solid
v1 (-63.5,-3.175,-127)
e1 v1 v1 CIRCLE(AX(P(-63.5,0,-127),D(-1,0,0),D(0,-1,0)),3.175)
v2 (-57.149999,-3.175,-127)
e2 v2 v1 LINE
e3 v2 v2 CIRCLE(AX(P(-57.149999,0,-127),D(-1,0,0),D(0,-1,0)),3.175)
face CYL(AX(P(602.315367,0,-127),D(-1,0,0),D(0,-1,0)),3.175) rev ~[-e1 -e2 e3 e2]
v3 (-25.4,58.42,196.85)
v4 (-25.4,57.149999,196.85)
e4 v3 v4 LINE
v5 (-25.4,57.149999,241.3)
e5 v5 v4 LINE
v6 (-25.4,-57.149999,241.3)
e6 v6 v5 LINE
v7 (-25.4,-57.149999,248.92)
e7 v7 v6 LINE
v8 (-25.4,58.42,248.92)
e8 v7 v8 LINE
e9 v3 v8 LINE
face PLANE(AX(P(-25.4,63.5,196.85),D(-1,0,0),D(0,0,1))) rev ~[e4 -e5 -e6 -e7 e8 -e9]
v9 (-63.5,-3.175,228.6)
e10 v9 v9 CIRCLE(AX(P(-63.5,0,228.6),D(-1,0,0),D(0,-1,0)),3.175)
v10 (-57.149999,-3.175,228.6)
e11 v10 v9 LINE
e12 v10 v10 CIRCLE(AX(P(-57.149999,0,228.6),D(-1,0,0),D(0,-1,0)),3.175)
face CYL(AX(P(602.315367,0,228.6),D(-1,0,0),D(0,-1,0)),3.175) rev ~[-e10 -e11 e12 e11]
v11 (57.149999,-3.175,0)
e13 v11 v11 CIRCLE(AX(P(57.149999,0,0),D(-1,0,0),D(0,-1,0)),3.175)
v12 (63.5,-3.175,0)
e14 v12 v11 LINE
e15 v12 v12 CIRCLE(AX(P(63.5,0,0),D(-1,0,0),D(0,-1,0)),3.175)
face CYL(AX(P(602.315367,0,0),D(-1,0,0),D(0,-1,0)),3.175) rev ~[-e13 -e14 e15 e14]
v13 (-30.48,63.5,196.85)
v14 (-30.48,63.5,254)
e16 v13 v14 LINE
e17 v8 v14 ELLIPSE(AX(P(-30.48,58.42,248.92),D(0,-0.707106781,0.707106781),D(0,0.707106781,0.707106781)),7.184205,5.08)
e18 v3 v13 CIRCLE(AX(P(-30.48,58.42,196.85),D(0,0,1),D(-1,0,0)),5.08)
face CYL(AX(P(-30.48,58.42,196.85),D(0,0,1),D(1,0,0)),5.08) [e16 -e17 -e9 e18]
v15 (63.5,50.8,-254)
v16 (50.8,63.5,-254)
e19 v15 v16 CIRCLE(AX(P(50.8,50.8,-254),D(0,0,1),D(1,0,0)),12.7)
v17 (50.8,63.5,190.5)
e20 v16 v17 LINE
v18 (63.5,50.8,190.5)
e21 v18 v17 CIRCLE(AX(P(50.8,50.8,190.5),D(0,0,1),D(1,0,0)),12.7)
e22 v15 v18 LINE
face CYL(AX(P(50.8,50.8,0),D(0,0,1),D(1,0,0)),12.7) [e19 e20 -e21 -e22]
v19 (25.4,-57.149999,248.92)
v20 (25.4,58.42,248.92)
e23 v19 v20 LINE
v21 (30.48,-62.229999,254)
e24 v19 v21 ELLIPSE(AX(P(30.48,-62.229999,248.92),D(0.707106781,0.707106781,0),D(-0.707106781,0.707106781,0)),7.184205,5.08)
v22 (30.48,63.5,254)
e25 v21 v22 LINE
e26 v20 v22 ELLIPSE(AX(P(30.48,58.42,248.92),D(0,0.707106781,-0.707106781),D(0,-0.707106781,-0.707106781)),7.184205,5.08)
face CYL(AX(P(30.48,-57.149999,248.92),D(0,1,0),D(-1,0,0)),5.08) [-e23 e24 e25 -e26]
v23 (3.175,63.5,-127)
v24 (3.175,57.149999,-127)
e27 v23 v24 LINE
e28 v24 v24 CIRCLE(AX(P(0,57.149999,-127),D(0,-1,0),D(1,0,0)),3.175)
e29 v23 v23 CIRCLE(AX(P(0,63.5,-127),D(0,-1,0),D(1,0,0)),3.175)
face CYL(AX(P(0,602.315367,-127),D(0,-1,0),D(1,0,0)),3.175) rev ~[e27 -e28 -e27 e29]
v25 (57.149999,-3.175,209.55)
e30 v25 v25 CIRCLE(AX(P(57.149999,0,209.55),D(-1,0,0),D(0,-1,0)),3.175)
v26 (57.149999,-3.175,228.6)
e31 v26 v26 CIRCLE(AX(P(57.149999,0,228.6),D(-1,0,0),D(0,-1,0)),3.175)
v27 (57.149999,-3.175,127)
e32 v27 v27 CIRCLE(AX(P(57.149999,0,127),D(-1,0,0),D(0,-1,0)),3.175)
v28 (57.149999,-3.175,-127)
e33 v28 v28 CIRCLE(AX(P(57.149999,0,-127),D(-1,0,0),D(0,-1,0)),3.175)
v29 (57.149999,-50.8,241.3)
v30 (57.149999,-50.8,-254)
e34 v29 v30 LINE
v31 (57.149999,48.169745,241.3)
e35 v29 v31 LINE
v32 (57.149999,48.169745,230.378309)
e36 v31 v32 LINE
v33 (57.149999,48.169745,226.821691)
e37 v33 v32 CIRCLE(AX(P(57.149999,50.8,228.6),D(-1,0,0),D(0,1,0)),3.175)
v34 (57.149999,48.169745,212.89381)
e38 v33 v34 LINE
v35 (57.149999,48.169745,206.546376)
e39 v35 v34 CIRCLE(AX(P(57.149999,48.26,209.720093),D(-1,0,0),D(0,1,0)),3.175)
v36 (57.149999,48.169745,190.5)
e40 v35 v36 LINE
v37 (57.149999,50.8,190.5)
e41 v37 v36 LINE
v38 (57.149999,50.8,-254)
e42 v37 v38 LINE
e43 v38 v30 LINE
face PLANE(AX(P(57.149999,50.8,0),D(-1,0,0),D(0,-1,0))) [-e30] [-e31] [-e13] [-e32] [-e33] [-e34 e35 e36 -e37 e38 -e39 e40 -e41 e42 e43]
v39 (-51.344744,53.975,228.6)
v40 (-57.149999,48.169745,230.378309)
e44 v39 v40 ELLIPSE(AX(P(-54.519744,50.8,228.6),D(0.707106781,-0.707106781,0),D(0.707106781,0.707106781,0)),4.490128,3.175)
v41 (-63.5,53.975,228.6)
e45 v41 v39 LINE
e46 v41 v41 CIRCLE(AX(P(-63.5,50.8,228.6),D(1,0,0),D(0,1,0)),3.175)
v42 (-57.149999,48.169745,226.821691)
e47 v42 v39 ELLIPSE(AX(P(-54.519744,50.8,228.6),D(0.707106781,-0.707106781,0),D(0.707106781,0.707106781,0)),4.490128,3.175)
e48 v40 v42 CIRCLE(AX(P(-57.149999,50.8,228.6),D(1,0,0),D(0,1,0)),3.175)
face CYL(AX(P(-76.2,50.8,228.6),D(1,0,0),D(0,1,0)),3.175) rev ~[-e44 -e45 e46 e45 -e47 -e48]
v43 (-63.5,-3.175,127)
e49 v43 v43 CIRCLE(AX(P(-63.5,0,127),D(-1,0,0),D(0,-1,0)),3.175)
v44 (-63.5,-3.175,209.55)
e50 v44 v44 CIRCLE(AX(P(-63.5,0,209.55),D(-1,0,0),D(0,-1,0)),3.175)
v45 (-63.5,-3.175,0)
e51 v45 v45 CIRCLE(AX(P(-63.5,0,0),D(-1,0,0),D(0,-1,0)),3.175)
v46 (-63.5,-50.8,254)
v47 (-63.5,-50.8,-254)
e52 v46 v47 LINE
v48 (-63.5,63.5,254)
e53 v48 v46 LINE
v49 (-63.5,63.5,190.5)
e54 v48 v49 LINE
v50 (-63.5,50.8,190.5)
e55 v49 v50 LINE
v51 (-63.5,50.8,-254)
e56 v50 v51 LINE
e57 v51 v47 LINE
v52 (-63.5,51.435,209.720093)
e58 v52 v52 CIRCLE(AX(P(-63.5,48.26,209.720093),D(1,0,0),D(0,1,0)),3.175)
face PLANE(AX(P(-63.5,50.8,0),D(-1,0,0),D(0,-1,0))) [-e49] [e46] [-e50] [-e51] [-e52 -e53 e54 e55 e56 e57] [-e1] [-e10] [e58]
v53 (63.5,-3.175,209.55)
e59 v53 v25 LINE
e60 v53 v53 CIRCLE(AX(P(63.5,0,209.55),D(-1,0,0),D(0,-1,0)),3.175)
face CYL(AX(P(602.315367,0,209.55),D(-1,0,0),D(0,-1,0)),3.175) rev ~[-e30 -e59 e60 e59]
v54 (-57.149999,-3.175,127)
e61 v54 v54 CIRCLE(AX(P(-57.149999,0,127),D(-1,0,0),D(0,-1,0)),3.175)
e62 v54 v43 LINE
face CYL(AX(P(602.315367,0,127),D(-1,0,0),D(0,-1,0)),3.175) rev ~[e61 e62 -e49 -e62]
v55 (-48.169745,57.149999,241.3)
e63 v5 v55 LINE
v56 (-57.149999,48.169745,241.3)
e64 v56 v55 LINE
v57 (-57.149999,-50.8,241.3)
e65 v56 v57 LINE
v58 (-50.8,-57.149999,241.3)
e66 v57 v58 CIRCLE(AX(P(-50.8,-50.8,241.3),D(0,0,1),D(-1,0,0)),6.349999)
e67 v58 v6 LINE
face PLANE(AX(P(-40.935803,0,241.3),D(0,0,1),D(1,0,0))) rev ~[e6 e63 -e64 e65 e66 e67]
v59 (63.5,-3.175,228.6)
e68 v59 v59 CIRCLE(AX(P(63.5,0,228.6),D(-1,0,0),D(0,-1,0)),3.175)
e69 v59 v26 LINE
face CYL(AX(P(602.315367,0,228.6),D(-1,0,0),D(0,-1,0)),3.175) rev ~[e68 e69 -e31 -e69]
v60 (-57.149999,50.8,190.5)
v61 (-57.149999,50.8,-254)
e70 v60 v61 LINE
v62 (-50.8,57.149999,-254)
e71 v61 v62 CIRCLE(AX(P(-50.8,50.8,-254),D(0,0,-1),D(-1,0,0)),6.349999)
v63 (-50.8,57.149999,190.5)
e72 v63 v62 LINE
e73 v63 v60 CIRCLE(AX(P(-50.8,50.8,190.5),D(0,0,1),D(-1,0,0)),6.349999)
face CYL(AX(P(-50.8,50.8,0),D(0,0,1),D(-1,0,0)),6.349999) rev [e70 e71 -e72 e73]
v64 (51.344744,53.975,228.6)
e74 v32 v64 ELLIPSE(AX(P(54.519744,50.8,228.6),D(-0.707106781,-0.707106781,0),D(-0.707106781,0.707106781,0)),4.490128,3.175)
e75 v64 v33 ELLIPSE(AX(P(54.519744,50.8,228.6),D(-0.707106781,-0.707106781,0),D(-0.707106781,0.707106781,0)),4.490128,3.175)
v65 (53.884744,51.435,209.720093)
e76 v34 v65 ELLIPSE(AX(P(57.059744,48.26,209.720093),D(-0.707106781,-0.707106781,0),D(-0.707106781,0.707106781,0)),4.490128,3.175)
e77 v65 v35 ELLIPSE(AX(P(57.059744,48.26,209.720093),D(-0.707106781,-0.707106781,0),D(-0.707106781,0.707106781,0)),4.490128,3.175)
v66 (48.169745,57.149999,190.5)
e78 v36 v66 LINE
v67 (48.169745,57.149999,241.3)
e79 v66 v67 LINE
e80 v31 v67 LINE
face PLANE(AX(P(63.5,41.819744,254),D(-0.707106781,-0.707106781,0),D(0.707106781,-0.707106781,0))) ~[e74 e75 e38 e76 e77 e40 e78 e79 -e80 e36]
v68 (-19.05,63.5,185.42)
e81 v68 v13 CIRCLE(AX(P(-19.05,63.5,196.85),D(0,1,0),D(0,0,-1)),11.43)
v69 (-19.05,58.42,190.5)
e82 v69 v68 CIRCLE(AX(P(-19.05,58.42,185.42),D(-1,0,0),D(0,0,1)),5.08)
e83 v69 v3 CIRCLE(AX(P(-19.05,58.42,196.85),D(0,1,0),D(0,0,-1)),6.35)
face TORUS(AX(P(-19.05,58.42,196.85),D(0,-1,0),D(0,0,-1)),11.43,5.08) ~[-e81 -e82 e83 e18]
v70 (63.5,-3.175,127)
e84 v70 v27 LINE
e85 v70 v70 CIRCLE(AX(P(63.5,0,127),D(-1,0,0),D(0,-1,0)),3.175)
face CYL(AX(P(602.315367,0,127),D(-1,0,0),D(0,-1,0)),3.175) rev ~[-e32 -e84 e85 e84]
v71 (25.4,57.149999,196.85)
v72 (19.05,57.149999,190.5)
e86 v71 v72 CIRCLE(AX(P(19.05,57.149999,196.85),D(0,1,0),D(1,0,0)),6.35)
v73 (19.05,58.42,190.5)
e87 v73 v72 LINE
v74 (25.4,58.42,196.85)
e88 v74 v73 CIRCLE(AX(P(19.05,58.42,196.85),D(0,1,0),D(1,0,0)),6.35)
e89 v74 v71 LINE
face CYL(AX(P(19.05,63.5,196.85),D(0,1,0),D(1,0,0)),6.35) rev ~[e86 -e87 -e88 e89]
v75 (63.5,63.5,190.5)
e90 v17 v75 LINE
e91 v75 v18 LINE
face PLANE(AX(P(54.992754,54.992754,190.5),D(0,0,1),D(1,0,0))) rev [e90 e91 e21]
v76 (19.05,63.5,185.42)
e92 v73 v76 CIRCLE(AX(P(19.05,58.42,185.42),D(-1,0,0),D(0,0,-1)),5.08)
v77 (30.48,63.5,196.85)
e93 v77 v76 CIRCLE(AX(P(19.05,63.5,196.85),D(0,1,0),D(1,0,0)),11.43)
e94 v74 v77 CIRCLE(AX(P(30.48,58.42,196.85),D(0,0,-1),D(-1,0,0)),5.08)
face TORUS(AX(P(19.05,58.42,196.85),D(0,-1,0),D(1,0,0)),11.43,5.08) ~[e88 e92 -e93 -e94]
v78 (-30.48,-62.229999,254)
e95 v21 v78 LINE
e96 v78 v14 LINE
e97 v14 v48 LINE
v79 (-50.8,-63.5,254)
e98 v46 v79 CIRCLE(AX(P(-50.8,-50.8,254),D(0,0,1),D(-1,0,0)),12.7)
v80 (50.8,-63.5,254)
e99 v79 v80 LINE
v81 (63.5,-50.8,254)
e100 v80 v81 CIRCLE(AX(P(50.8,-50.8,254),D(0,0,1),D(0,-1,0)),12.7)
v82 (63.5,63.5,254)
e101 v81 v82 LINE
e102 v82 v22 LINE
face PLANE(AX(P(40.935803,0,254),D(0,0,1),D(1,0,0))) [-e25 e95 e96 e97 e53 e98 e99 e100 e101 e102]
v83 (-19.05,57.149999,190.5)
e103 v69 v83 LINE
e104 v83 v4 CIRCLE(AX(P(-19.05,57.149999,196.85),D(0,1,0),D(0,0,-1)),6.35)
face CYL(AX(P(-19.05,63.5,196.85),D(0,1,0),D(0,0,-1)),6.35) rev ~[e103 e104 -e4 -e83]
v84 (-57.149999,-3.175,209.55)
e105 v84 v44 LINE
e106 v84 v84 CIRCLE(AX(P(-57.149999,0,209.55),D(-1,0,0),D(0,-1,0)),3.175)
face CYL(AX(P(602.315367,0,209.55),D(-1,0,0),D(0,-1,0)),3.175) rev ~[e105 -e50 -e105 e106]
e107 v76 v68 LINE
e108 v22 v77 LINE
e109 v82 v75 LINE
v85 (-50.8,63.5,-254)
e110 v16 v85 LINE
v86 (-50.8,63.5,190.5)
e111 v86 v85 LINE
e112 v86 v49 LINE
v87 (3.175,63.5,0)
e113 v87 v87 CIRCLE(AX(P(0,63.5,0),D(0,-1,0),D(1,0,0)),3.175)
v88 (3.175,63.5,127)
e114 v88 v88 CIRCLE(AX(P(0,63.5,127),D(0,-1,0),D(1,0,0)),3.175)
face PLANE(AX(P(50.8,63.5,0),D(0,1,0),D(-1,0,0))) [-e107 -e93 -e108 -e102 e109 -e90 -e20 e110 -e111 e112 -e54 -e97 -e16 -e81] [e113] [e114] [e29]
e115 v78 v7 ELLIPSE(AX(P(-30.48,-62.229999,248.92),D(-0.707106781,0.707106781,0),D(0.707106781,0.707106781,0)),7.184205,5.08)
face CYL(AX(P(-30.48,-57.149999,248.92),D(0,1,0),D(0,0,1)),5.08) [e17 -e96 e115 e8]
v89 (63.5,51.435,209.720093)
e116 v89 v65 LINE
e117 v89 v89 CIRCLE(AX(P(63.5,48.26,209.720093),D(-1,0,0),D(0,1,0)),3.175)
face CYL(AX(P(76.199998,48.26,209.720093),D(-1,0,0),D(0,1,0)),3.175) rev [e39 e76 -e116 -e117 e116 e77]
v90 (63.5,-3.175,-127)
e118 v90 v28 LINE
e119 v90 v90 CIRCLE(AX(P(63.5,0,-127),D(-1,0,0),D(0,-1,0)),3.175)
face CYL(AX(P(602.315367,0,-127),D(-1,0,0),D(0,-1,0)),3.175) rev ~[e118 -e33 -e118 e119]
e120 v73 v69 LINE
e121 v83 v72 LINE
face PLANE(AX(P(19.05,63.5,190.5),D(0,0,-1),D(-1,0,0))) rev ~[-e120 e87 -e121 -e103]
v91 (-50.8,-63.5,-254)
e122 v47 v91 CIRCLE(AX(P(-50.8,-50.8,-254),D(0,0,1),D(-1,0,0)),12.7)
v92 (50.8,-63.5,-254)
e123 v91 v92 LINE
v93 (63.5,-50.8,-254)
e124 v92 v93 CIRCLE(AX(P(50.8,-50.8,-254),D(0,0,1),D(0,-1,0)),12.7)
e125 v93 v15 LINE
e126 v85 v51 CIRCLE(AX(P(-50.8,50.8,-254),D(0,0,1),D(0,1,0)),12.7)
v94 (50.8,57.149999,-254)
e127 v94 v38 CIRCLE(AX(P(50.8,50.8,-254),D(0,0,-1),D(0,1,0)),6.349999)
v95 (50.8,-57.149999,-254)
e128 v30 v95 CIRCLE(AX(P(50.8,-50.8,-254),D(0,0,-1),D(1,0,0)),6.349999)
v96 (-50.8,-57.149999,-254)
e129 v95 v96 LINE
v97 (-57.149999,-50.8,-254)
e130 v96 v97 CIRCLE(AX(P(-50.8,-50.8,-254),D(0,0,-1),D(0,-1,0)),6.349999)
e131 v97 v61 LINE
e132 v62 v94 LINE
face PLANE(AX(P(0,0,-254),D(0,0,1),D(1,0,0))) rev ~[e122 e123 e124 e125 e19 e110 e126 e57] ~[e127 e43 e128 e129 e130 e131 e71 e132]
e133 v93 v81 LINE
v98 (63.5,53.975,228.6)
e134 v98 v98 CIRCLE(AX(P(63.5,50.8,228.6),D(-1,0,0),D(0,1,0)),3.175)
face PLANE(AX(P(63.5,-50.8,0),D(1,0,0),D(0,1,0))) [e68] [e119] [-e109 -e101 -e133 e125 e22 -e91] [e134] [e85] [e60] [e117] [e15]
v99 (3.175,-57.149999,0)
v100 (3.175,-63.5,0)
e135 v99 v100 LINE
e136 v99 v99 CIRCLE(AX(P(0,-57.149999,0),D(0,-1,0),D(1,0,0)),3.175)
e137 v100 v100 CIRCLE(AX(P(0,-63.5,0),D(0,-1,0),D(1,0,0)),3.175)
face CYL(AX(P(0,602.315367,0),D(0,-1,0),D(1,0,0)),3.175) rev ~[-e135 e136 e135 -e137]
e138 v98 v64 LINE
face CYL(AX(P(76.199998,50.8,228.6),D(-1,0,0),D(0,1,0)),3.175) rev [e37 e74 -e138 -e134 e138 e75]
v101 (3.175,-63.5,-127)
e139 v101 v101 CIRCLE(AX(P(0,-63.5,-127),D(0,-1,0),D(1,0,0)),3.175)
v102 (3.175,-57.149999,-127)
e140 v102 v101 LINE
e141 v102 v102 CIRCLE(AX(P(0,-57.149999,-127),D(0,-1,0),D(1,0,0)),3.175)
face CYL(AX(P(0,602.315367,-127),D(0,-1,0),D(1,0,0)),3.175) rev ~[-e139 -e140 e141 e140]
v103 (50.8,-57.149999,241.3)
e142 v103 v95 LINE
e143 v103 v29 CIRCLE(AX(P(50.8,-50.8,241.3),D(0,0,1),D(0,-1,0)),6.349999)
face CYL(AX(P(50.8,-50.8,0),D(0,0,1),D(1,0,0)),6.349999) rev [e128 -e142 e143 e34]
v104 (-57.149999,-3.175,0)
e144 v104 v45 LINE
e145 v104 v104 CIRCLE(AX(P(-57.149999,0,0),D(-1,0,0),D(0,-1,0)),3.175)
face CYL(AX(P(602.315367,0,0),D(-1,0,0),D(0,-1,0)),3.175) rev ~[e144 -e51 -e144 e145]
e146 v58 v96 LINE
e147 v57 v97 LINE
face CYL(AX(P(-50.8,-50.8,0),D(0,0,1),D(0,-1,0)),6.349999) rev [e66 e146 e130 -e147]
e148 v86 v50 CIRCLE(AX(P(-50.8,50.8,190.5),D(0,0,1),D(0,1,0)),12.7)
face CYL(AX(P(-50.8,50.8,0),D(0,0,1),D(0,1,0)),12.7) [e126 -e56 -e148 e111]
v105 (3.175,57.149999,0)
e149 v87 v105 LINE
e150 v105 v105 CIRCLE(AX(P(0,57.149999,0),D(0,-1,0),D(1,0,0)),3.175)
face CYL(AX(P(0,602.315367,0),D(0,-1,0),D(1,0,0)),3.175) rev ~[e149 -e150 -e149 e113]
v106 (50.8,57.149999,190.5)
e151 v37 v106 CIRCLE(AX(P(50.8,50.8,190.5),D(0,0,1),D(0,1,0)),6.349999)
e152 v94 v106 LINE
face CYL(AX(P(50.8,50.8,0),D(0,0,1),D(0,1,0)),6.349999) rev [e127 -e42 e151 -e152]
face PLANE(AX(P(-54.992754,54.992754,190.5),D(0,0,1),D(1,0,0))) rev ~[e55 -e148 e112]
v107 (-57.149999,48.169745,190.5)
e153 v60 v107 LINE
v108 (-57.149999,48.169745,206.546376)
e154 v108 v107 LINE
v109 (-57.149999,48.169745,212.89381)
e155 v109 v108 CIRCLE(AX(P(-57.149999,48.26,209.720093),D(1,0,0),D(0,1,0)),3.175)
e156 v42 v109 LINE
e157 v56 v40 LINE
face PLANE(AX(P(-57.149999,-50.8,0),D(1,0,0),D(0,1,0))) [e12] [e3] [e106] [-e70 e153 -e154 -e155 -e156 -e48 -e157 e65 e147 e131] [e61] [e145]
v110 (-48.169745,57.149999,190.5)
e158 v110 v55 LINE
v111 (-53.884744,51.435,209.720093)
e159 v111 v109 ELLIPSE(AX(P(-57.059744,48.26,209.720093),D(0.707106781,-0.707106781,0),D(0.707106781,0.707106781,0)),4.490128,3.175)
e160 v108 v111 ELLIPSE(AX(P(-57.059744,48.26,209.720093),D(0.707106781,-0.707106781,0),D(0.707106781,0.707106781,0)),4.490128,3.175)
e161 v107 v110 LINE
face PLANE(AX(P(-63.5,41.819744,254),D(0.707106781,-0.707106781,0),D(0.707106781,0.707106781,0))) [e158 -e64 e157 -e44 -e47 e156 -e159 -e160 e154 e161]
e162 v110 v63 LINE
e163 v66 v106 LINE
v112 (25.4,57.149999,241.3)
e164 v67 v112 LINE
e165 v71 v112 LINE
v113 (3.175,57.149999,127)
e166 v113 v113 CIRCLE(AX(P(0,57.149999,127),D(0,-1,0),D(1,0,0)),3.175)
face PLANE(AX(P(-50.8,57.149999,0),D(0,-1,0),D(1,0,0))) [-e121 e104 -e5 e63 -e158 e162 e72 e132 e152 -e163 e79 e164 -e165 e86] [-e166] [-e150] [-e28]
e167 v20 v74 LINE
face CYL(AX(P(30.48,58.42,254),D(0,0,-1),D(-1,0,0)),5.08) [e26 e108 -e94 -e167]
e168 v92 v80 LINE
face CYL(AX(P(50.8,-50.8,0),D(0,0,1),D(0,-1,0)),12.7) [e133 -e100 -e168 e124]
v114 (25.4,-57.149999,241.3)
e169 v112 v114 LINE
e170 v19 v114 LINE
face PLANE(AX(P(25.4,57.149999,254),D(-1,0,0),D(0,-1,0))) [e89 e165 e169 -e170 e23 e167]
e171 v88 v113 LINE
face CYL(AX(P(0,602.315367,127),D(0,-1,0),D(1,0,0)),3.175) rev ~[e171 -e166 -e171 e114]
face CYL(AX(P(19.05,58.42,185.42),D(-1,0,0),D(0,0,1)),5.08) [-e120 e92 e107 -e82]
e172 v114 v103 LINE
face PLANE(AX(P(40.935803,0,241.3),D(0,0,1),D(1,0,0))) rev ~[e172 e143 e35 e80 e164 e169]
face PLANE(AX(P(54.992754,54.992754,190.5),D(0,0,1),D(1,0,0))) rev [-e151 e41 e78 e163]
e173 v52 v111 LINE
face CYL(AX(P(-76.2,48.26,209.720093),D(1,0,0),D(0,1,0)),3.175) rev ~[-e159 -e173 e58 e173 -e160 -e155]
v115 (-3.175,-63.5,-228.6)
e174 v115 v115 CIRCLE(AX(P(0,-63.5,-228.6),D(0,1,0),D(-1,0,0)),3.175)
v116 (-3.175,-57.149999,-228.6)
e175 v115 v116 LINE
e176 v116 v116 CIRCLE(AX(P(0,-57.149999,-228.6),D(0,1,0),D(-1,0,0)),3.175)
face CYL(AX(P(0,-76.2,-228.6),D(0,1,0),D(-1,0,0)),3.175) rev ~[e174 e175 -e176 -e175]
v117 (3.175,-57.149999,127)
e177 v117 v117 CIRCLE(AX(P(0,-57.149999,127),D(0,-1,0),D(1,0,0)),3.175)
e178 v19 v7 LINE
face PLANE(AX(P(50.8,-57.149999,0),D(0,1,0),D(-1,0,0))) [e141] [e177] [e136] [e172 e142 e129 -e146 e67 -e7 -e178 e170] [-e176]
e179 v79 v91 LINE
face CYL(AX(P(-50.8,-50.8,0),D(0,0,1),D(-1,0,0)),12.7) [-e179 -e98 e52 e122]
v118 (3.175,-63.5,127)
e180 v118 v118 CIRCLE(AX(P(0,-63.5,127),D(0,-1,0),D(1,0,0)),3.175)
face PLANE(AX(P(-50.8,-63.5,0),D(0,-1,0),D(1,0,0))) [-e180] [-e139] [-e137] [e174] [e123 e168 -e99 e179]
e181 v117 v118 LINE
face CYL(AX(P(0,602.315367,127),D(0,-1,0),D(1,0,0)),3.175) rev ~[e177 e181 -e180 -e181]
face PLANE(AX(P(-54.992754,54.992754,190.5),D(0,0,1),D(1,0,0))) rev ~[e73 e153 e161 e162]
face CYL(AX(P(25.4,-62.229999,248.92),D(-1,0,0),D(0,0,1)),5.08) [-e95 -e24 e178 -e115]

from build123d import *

# Parameters (mm, degrees)
F1_DEPTH      = 254
F1_DEPTH_BACK = 254
F4_DEPTH      = 12.7
F6_D          = 6.35
F8_D          = 6.35
F8_DEPTH      = 12.7
F8_TIP        = 1.9077324654
F10_D         = 6.35
F12_D         = 6.35
F14_DEPTH     = 25.4
F15_R         = 5.08
F17_DEPTH     = 63.5
F19_D         = 6.35
F19_DEPTH     = 12.7
F19_TIP       = 1.9077324654


# Not quite as in the source:
# - a pattern or mirror of a feature is missing from the dataset's text; its kind, count and spacing are read off the source's solid
# - a feature names something its author has since deleted; it is built from what else it names


with BuildPart() as f1:
    # F0 (on Top) → F1 (new body, two sides)
    with BuildSketch(Plane.XY) as f1_sk:
        with BuildLine():
            Line((-50.8, -63.5), (50.8, -63.5))
            ThreePointArc((50.8, -63.5), (59.7802561211, -59.7802561211), (63.5, -50.8))
            Line((63.5, -50.8), (63.5, 50.8))
            ThreePointArc((63.5, 50.8), (59.7802561211, 59.7802561211), (50.8, 63.5))
            Line((50.8, 63.5), (-50.8, 63.5))
            ThreePointArc((-50.8, 63.5), (-59.7802561211, 59.7802561211), (-63.5, 50.8))
            Line((-63.5, 50.8), (-63.5, -50.8))
            ThreePointArc((-63.5, -50.8), (-59.7802561211, -59.7802561211), (-50.8, -63.5))
        make_face()
        with BuildLine():
            ThreePointArc((50.8, 57.1499988437), (55.2901272429, 55.2901272429), (57.1499988437, 50.8))
            Line((57.1499988437, 50.8), (57.1499988437, -50.8))
            ThreePointArc((57.1499988437, -50.8), (55.2901272429, -55.2901272429), (50.8, -57.1499988437))
            Line((50.8, -57.1499988437), (-50.8, -57.1499988437))
            ThreePointArc((-50.8, -57.1499988437), (-55.2901272429, -55.2901272429), (-57.1499988437, -50.8))
            Line((-57.1499988437, -50.8), (-57.1499988437, 50.8))
            ThreePointArc((-57.1499988437, 50.8), (-55.2901272429, 55.2901272429), (-50.8, 57.1499988437))
            Line((-50.8, 57.1499988437), (50.8, 57.1499988437))
        make_face(mode=Mode.SUBTRACT)
    extrude(amount=F1_DEPTH)
    extrude(f1_sk.sketch, amount=-F1_DEPTH_BACK)

    # F3 (on face) → F4 (join)
    with BuildSketch(Plane.XY.offset(254)):
        with BuildLine():
            Line((50.8, 57.1499988437), (25.4, 57.1499988437))
            Line((25.4, 57.1499988437), (25.4, -57.1499988437))
            Line((25.4, -57.1499988437), (50.8, -57.1499988437))
            ThreePointArc((50.8, -57.1499988437), (55.2901272429, -55.2901272429), (57.1499988437, -50.8))
            Line((57.1499988437, -50.8), (57.1499988437, 50.8))
            ThreePointArc((57.1499988437, 50.8), (55.2901272429, 55.2901272429), (50.8, 57.1499988437))
        make_face()
        with BuildLine():
            Line((-25.4, -57.1499988437), (-25.4, 57.1499988437))
            Line((-25.4, 57.1499988437), (-50.8, 57.1499988437))
            ThreePointArc((-50.8, 57.1499988437), (-55.2901272429, 55.2901272429), (-57.1499988437, 50.8))
            Line((-57.1499988437, 50.8), (-57.1499988437, -50.8))
            ThreePointArc((-57.1499988437, -50.8), (-55.2901272429, -55.2901272429), (-50.8, -57.1499988437))
            Line((-50.8, -57.1499988437), (-25.4, -57.1499988437))
        make_face()
    extrude(amount=-F4_DEPTH)

    # F6 (through all)
    with Locations(Plane.YZ.offset(63.5)):
        with Locations((0, 209.55), (0, 228.6)):
            Hole(F6_D / 2)

    # F8
    with Locations(Plane.XZ.offset(63.5)):
        with Locations((0, -228.6)):
            Hole(F8_D / 2, depth=F8_DEPTH)
            with Locations((0, 0, -(F8_DEPTH + F8_TIP / 2))):  # 118° drill point
                Cone(0, F8_D / 2, F8_TIP, mode=Mode.SUBTRACT)

    # F10 (through all)
    with Locations(Plane.YZ.offset(63.5)):
        with Locations((0, 0), (0, -127), (0, 127)):
            Hole(F10_D / 2)

    # F12 (through all)
    with Locations(Plane(origin=(0, 63.5, 0), x_dir=(-1, 0, 0), z_dir=(0, 1, 0))):
        with Locations((0, 0), (0, -127), (0, 127)):
            Hole(F12_D / 2)

    # F13 (on face) → F14 (cut)
    with BuildSketch(Plane(origin=(0, 63.5, 0), x_dir=(-1, 0, 0), z_dir=(0, 1, 0))):
        with BuildLine():
            Line((25.4, 196.85), (25.4, 254))
            Line((25.4, 254), (-25.4, 254))
            Line((-25.4, 254), (-25.4, 196.85))
            ThreePointArc((-25.4, 196.85), (-23.5401280605, 192.3598719395), (-19.05, 190.5))
            Line((-19.05, 190.5), (19.05, 190.5))
            ThreePointArc((19.05, 190.5), (23.5401280605, 192.3598719395), (25.4, 196.85))
        make_face()
    extrude(amount=-F14_DEPTH, mode=Mode.SUBTRACT)

    # F15
    f15_edges = [f1.edges().sort_by_distance(p)[0] for p in [
        (25.4, 63.5, 225.425),
        (-25.4, 3.175001, 254),
        (25.4, 3.175001, 254),
        (0, -57.149999, 254),
        (-25.4, 63.5, 225.425),
        (-23.540128, 63.5, 192.359872),
        (0, 63.5, 190.5),
        (23.540128, 63.5, 192.359872),
    ]]
    fillet(f15_edges, radius=F15_R)

    # F16 (on face) → F17 (join)
    with BuildSketch(Plane.XY.offset(254)):
        with BuildLine():
            Line((-63.5, 50.8), (-63.5, 41.8197438789))
            Line((-63.5, 41.8197438789), (-41.8197438789, 63.5))
            Line((-41.8197438789, 63.5), (-50.8, 63.5))
            ThreePointArc((-50.8, 63.5), (-59.7802561211, 59.7802561211), (-63.5, 50.8))
        make_face()
        with BuildLine():
            Line((-63.5, 63.5), (-63.5, 50.8))
            ThreePointArc((-63.5, 50.8), (-59.7802561211, 59.7802561211), (-50.8, 63.5))
            Line((-50.8, 63.5), (-63.5, 63.5))
        make_face()
    f17 = extrude(amount=-F17_DEPTH)

    # F17_copies: F17 across plane
    add(f17.mirror(Plane(origin=(0, 0, 0), x_dir=(0, 0, 1), z_dir=(1, 0, 0))))

    # F19
    with Locations(Plane(origin=(-63.5, 0, 0), x_dir=(0, -1, 0), z_dir=(-1, 0, 0))):
        with Locations((-48.26, 209.7200926909), (-50.8, 228.6)):
            f19 = Hole(F19_D / 2, depth=F19_DEPTH)
            with Locations((0, 0, -(F19_DEPTH + F19_TIP / 2))):  # 118° drill point
                Cone(0, F19_D / 2, F19_TIP, mode=Mode.SUBTRACT)

    # F19_copies: F19 across plane
    add(f19.mirror(Plane(origin=(-1e-06, 0, 0), x_dir=(0, 0, 1), z_dir=(1, 0, 0))), mode=Mode.SUBTRACT)


solid = f1.part
